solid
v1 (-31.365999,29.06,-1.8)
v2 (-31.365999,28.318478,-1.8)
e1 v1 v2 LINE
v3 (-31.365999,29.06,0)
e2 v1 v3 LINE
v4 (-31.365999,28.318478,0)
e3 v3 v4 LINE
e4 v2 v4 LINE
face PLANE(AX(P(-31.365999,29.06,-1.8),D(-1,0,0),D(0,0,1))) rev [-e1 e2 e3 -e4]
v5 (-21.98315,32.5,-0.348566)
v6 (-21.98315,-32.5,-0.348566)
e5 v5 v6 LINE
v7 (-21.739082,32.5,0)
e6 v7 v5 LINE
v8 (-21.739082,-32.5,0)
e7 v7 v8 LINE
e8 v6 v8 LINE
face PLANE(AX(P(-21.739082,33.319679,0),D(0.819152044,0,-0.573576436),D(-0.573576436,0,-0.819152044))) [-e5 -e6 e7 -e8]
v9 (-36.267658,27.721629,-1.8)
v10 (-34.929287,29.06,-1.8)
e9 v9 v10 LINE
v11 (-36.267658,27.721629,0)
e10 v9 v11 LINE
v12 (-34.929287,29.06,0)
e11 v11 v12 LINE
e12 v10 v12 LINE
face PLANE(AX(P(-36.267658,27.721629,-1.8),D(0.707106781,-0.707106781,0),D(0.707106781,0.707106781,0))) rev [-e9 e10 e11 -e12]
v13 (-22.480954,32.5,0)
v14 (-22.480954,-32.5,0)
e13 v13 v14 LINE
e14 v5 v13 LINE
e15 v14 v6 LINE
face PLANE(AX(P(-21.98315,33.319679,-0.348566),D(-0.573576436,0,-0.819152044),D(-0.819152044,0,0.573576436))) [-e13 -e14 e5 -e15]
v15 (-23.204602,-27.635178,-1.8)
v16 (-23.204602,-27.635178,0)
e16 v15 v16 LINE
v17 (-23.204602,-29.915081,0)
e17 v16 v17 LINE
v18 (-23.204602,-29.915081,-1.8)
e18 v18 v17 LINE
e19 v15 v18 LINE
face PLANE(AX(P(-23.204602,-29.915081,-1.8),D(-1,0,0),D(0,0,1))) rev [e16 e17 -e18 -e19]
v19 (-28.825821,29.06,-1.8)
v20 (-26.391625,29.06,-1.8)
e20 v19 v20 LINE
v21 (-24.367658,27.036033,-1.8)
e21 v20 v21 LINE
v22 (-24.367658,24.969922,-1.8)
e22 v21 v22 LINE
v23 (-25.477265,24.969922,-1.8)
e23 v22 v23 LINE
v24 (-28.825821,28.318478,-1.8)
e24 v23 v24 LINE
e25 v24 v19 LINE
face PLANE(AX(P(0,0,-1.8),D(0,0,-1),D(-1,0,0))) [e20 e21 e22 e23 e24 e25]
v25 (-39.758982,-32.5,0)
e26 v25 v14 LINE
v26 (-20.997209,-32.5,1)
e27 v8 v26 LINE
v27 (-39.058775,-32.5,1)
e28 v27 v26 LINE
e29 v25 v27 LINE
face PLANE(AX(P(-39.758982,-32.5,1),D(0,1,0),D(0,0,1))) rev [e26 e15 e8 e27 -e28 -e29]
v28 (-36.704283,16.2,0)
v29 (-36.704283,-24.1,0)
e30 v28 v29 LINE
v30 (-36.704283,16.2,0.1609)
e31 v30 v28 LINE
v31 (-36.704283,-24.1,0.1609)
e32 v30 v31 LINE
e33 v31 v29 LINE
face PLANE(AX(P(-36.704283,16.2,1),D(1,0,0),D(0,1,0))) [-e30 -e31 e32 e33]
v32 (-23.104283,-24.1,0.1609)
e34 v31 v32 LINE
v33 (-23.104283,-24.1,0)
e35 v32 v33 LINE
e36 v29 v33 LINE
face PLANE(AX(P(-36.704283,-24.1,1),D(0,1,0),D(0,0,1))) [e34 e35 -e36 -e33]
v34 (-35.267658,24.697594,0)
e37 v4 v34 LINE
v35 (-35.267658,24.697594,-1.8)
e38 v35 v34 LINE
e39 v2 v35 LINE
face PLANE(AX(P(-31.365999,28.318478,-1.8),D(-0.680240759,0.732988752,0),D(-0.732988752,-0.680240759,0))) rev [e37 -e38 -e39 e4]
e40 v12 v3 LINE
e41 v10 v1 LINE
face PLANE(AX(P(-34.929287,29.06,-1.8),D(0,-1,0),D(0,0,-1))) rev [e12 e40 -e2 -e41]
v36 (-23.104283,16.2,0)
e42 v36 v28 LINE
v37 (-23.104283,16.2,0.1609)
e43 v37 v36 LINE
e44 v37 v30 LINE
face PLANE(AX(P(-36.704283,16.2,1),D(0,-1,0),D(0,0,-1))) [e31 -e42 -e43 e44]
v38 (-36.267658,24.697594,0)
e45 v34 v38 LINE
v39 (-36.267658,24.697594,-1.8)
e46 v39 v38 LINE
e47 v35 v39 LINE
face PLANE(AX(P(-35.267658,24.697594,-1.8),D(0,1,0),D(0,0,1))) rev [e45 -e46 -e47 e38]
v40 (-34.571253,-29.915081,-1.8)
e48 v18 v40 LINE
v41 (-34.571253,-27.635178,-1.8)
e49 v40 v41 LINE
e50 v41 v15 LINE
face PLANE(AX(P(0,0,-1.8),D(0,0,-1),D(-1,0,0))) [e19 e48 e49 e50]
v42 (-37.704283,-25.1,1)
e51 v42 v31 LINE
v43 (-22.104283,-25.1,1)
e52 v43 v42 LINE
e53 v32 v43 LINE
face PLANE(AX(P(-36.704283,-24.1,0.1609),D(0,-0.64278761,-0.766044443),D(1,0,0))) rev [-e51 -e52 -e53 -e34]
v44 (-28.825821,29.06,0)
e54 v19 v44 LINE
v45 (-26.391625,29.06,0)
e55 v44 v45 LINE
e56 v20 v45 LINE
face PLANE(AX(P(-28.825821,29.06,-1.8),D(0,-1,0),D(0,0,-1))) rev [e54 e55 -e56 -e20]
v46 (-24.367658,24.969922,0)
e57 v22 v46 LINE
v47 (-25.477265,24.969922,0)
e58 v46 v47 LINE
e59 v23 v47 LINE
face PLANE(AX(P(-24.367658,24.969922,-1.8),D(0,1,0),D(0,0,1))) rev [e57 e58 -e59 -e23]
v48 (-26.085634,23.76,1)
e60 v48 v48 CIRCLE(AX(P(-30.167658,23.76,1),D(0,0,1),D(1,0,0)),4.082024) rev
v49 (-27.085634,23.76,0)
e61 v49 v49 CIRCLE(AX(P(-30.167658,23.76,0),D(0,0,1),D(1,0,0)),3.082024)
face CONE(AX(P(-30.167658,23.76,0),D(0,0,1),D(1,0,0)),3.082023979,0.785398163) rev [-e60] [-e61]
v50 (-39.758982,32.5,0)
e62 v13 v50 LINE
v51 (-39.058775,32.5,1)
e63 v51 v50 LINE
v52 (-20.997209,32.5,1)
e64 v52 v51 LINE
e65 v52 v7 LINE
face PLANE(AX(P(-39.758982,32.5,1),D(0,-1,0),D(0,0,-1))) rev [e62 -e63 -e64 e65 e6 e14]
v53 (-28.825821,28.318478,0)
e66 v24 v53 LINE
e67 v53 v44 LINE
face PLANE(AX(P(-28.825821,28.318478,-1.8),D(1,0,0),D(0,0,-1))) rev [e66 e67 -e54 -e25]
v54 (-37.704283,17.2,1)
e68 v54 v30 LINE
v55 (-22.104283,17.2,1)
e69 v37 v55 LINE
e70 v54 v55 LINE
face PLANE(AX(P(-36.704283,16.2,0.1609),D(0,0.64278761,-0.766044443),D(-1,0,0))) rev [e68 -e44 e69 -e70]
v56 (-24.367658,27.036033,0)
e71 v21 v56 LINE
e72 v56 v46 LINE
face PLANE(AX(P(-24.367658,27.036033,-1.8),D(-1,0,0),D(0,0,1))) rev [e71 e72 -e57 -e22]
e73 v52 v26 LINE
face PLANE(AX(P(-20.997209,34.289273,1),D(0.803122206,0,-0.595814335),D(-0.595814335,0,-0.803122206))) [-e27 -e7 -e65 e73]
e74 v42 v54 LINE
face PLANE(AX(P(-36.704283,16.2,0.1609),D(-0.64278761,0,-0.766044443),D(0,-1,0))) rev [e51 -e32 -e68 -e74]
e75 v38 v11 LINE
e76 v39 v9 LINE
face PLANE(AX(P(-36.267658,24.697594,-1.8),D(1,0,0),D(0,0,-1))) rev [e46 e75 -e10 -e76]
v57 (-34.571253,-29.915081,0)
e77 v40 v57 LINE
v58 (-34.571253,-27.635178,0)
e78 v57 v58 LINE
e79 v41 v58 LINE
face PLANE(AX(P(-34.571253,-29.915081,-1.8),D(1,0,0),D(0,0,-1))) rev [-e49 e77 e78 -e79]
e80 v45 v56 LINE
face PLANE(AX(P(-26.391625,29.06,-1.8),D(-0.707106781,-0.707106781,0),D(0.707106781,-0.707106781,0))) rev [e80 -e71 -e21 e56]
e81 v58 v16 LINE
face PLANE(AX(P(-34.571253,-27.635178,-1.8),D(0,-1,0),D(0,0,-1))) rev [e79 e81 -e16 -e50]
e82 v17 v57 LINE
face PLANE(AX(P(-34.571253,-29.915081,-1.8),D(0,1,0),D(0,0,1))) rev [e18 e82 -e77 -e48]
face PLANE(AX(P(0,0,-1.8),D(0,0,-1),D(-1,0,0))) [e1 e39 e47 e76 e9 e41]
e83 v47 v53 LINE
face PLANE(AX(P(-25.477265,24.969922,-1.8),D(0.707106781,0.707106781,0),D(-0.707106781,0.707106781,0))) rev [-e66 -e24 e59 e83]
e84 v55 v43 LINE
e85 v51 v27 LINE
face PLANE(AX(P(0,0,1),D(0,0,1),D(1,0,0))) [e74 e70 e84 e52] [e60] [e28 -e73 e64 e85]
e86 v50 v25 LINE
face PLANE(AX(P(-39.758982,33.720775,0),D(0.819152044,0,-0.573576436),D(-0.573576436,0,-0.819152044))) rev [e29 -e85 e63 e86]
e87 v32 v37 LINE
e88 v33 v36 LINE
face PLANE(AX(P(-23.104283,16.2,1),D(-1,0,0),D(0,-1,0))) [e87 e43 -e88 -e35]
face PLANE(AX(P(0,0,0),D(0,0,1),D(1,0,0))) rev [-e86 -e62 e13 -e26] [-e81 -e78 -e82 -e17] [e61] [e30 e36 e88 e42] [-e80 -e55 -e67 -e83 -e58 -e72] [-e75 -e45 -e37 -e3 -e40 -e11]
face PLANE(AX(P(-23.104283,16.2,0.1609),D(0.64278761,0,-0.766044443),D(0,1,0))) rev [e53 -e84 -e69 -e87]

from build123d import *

# Parameters (mm, degrees)
SKETCH_1_W          = 17.278028126
SKETCH_1_H          = 65
SKETCH_1_R          = 3.082023979
SKETCH_1_W_2        = 13.6
SKETCH_1_H_2        = 40.3
EXTRUDE_1_DEPTH     = 1
SKETCH_2_W          = 11.366651046
SKETCH_2_H          = 2.279902362
EXTRUDE_2_DEPTH     = 1.8
EXTRUDE_3_DEPTH     = 65
CUT_EXTRUDE_1_DEPTH = 65
EXTRUDE_4_DEPTH     = 65
CHAMFER_1_SIZE      = 1
CHAMFER_2_SIZE      = 1
CHAMFER_2_SIZE2     = 0.839099631


with BuildPart() as part:
    # 草图1 → 凸台-拉伸1 (new body)
    with BuildSketch(Plane.XY):
        with Locations((-31.11996815, 0)):
            Rectangle(SKETCH_1_W, SKETCH_1_H)
        with Locations((-30.167658157, 23.76)):
            Circle(SKETCH_1_R, mode=Mode.SUBTRACT)
        with Locations((-29.904282539, -3.95)):
            Rectangle(SKETCH_1_W_2, SKETCH_1_H_2, mode=Mode.SUBTRACT)
    extrude(amount=EXTRUDE_1_DEPTH)

    # 草图2 → 凸台-拉伸2 (add)
    with BuildSketch(Plane(origin=(0, 0, 0), x_dir=(-1, 0, 0), z_dir=(0, 0, -1))):
        Polygon((36.267658157, 24.697593501), (36.267658157, 27.721628521), (34.929286678, 29.06), (31.365999463, 29.06), (31.365999463, 28.318477538), (35.267658157, 24.697593501), align=None)
        Polygon((28.825820559, 29.06), (26.391624704, 29.06), (24.367658157, 27.036033454), (24.367658157, 24.969921966), (25.477264987, 24.969921966), (28.825820559, 28.318477538), align=None)
        with Locations((28.887927563, -28.775129659)):
            Rectangle(SKETCH_2_W, SKETCH_2_H)
    extrude(amount=EXTRUDE_2_DEPTH)

    # 草图3 → 凸台-拉伸3 (add)
    with BuildSketch(Plane.XZ.offset(32.5)):
        Polygon((-22.480954087, 1), (-20.997208948, 1), (-21.739081518, 0), (-22.480954087, 0), align=None)
    extrude(amount=-EXTRUDE_3_DEPTH)

    # 草图4 → 切除-拉伸1 (cut)
    with BuildSketch(Plane.XZ.offset(32.5)):
        Polygon((-39.758982213, 0), (-39.058774675, 1), (-39.758982213, 1), align=None)
    extrude(amount=-CUT_EXTRUDE_1_DEPTH, mode=Mode.SUBTRACT)

    # 草图5 → 凸台-拉伸4 (add)
    with BuildSketch(Plane.XZ.offset(32.5)):
        Polygon((-21.739081518, 0), (-21.983150121, -0.34856609), (-22.480954087, 0), align=None)
    extrude(amount=-EXTRUDE_4_DEPTH)

    # 倒角1
    chamfer_1_edges = [part.edges().sort_by_distance(p)[0] for p in [
        (-33.249682136, 23.76, 1),
    ]]
    chamfer(chamfer_1_edges, length=CHAMFER_1_SIZE - 0.0001)  # a hair under: the kernel refuses the full size

    # 倒角2
    chamfer_2_edges = [part.edges().sort_by_distance(p)[0] for p in [
        (-36.704282539, -3.95, 1),
        (-29.904282539, -24.1, 1),
        (-23.104282539, -3.95, 1),
        (-29.904282539, 16.2, 1),
    ]]
    chamfer_2_side = [part.faces().sort_by_distance(p)[0] for p in [
        (-34.924209452, 23.76, 1),
    ]]
    chamfer(chamfer_2_edges, length=CHAMFER_2_SIZE, length2=CHAMFER_2_SIZE2, reference=chamfer_2_side[0])


solid = part.part
